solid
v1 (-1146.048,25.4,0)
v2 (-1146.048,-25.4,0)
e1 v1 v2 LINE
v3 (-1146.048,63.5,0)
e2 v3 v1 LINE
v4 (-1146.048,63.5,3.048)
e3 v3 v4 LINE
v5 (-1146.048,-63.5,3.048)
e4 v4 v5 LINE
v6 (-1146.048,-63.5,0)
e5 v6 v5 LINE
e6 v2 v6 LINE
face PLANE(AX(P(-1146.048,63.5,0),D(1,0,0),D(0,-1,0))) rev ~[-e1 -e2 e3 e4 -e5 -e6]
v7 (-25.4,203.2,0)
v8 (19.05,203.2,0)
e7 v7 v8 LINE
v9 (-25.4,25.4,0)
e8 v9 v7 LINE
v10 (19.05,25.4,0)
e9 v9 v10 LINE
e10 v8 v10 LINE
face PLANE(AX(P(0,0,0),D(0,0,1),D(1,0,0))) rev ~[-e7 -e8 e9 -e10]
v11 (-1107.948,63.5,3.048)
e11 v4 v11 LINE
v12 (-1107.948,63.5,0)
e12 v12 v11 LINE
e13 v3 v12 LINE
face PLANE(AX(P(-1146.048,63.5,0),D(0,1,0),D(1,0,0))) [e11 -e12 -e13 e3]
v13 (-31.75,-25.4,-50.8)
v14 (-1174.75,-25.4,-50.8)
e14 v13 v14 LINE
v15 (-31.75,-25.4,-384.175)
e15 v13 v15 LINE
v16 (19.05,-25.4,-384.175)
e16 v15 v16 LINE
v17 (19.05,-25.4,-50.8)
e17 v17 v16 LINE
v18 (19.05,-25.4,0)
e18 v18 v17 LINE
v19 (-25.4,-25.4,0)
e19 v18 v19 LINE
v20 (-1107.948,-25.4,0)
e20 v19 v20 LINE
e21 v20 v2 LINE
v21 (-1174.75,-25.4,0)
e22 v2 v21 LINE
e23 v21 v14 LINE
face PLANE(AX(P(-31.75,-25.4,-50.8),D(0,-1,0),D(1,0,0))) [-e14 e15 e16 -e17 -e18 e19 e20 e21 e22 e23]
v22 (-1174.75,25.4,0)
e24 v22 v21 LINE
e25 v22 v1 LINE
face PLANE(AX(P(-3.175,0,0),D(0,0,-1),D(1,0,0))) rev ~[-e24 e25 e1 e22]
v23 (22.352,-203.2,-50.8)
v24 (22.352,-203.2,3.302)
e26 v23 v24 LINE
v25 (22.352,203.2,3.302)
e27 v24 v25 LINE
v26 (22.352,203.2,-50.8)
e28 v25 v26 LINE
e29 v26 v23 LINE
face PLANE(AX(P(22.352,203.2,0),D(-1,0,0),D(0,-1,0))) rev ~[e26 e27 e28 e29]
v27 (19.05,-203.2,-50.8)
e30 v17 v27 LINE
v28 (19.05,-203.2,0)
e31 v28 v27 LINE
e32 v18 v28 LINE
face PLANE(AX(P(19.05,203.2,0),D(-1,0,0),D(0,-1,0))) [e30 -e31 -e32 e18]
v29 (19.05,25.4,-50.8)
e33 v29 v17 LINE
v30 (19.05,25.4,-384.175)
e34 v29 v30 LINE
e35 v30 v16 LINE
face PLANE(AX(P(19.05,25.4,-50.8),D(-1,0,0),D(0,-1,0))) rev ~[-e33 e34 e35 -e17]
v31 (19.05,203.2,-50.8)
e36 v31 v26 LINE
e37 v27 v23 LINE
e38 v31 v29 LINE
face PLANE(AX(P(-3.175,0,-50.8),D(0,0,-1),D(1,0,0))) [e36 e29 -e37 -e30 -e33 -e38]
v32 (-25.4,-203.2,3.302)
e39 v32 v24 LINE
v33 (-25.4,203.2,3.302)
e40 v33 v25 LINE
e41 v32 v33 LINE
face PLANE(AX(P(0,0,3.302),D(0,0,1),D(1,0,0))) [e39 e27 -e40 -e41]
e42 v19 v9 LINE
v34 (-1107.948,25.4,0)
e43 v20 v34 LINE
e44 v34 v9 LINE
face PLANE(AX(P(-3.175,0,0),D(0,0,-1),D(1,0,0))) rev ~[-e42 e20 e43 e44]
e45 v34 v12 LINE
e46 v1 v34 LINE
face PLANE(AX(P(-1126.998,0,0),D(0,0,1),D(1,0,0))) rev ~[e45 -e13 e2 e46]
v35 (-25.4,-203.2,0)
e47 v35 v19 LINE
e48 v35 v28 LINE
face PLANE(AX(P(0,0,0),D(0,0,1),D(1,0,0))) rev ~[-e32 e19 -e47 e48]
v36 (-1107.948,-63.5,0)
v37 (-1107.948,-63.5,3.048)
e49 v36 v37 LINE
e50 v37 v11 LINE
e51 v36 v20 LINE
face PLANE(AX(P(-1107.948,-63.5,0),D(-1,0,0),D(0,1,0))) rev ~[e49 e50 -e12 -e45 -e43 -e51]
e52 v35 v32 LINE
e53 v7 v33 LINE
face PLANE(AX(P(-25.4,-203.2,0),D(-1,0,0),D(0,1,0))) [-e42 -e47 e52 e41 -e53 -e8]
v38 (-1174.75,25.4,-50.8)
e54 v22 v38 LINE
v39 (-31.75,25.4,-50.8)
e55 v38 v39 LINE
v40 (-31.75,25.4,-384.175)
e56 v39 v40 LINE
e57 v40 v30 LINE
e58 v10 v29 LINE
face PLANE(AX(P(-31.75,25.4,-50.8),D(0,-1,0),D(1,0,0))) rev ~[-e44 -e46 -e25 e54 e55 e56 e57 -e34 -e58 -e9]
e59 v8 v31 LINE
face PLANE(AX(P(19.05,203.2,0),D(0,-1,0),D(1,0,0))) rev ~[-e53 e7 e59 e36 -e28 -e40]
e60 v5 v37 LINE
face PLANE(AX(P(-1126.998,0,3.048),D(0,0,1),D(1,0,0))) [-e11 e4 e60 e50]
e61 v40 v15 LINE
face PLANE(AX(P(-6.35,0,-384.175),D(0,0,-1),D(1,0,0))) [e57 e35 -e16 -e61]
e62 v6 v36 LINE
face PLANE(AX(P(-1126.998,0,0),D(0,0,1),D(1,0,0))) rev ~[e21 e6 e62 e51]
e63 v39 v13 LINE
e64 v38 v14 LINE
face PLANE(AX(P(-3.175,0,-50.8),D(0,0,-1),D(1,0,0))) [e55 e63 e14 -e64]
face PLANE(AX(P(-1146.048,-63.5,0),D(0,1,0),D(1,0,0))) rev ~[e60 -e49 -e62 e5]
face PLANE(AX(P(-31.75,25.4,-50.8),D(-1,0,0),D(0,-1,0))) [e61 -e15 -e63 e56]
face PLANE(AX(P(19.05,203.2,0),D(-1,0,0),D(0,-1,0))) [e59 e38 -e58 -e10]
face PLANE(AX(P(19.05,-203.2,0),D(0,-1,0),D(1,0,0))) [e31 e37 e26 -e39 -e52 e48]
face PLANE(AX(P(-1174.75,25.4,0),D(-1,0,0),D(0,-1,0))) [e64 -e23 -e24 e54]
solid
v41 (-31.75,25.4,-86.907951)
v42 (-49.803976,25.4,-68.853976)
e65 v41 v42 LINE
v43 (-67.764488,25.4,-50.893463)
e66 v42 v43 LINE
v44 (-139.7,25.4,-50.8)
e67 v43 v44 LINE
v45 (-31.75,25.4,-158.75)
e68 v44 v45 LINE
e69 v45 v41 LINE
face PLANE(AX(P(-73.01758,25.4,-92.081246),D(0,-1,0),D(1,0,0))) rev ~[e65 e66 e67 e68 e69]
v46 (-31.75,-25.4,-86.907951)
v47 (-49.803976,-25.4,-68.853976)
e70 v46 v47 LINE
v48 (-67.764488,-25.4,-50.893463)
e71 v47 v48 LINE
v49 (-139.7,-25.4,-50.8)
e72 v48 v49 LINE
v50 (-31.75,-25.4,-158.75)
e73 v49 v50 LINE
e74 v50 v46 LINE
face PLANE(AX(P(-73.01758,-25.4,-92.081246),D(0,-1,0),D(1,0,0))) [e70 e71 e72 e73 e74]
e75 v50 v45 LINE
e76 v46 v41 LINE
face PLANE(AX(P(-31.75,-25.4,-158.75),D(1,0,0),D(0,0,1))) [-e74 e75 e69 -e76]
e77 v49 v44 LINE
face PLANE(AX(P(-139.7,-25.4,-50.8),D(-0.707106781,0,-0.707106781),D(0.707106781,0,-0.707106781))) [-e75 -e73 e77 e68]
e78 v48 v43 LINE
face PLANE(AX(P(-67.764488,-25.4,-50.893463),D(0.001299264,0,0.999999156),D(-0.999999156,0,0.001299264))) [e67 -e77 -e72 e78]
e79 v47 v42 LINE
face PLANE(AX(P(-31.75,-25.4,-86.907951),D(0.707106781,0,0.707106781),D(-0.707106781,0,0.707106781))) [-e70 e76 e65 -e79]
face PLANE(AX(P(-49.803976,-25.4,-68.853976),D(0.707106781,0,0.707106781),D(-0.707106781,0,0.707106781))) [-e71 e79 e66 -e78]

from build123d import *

# Parameters (mm, degrees)
F0_W      = 50.8
F0_H      = 406.4
F1_DEPTH  = 6.35
F2_W      = 6.35
F2_H      = 406.4
F3_DEPTH  = 50.8
F4_DEPTH  = 3.048
F5_DEPTH  = 3.048
F6_W      = 1149.35
F6_H      = 50.8
F7_DEPTH  = 50.8
F8_W      = 38.1
F8_H      = 50.8
F8_H_2    = 38.1
F9_DEPTH  = 3.048
F10_W     = 50.8
F10_H     = 50.8
F11_DEPTH = 333.375
F13_DEPTH = 50.8


# Not quite as in the source:
# - a feature names something its author has since deleted; it is built from what else it names


with BuildPart() as f1:
    # F0 (on Top) → F1 (new body)
    with BuildSketch(Plane.XY):
        Rectangle(F0_W, F0_H)
    extrude(amount=F1_DEPTH)

    # F2 (on face) → F3 (join)
    with BuildSketch(Plane(origin=(0, 0, 0), x_dir=(1, 0, 0), z_dir=(0, 0, -1))):
        with Locations((22.225, 0)):
            Rectangle(F2_W, F2_H)
    extrude(amount=F3_DEPTH)

    # F4 (cut): a face of the model
    f4_faces = [f1.faces().sort_by_distance(p)[0] for p in [
        (25.4, 0, -22.225),
    ]]
    extrude(f4_faces, amount=-F4_DEPTH, mode=Mode.SUBTRACT)

    # F5 (cut): a face of the model
    f5_faces = [f1.faces().sort_by_distance(p)[0] for p in [
        (-1.524, 0, 6.35),
    ]]
    extrude(f5_faces, amount=-F5_DEPTH, mode=Mode.SUBTRACT)

    # F6 (on face) → F7 (join)
    with BuildSketch(Plane(origin=(0, 0, 0), x_dir=(1, 0, 0), z_dir=(0, 0, -1))):
        Polygon((19.05, -25.4), (19.05, 0), (19.05, 25.4), (-25.4, 25.4), (-25.4, -25.4), align=None)
        with Locations((-600.075, 0)):
            Rectangle(F6_W, F6_H)
    extrude(amount=F7_DEPTH)

    # F8 (on face) → F9 (join)
    with BuildSketch(Plane.XY):
        with Locations((-1126.998, 0)):
            Rectangle(F8_W, F8_H)
        with Locations((-1126.998, 44.45)):
            Rectangle(F8_W, F8_H_2)
        with Locations((-1126.998, -44.45)):
            Rectangle(F8_W, F8_H_2)
    extrude(amount=F9_DEPTH)

    # F10 (on face) → F11 (join)
    with BuildSketch(Plane(origin=(0, 0, -50.8), x_dir=(1, 0, 0), z_dir=(0, 0, -1))):
        with Locations((-6.35, 0)):
            Rectangle(F10_W, F10_H)
    extrude(amount=F11_DEPTH)


with BuildPart() as f13:
    # F12 (on face) → F13 (new body)
    with BuildSketch(Plane.XZ.offset(25.4)):
        Polygon((-67.7644877579, -50.8934632736), (-139.7, -50.8), (-31.75, -158.75), (-31.75, -86.9079510314), (-49.8039755157, -68.8539755157), align=None)
    extrude(amount=-F13_DEPTH)


solid = Compound([f1.part, f13.part])
